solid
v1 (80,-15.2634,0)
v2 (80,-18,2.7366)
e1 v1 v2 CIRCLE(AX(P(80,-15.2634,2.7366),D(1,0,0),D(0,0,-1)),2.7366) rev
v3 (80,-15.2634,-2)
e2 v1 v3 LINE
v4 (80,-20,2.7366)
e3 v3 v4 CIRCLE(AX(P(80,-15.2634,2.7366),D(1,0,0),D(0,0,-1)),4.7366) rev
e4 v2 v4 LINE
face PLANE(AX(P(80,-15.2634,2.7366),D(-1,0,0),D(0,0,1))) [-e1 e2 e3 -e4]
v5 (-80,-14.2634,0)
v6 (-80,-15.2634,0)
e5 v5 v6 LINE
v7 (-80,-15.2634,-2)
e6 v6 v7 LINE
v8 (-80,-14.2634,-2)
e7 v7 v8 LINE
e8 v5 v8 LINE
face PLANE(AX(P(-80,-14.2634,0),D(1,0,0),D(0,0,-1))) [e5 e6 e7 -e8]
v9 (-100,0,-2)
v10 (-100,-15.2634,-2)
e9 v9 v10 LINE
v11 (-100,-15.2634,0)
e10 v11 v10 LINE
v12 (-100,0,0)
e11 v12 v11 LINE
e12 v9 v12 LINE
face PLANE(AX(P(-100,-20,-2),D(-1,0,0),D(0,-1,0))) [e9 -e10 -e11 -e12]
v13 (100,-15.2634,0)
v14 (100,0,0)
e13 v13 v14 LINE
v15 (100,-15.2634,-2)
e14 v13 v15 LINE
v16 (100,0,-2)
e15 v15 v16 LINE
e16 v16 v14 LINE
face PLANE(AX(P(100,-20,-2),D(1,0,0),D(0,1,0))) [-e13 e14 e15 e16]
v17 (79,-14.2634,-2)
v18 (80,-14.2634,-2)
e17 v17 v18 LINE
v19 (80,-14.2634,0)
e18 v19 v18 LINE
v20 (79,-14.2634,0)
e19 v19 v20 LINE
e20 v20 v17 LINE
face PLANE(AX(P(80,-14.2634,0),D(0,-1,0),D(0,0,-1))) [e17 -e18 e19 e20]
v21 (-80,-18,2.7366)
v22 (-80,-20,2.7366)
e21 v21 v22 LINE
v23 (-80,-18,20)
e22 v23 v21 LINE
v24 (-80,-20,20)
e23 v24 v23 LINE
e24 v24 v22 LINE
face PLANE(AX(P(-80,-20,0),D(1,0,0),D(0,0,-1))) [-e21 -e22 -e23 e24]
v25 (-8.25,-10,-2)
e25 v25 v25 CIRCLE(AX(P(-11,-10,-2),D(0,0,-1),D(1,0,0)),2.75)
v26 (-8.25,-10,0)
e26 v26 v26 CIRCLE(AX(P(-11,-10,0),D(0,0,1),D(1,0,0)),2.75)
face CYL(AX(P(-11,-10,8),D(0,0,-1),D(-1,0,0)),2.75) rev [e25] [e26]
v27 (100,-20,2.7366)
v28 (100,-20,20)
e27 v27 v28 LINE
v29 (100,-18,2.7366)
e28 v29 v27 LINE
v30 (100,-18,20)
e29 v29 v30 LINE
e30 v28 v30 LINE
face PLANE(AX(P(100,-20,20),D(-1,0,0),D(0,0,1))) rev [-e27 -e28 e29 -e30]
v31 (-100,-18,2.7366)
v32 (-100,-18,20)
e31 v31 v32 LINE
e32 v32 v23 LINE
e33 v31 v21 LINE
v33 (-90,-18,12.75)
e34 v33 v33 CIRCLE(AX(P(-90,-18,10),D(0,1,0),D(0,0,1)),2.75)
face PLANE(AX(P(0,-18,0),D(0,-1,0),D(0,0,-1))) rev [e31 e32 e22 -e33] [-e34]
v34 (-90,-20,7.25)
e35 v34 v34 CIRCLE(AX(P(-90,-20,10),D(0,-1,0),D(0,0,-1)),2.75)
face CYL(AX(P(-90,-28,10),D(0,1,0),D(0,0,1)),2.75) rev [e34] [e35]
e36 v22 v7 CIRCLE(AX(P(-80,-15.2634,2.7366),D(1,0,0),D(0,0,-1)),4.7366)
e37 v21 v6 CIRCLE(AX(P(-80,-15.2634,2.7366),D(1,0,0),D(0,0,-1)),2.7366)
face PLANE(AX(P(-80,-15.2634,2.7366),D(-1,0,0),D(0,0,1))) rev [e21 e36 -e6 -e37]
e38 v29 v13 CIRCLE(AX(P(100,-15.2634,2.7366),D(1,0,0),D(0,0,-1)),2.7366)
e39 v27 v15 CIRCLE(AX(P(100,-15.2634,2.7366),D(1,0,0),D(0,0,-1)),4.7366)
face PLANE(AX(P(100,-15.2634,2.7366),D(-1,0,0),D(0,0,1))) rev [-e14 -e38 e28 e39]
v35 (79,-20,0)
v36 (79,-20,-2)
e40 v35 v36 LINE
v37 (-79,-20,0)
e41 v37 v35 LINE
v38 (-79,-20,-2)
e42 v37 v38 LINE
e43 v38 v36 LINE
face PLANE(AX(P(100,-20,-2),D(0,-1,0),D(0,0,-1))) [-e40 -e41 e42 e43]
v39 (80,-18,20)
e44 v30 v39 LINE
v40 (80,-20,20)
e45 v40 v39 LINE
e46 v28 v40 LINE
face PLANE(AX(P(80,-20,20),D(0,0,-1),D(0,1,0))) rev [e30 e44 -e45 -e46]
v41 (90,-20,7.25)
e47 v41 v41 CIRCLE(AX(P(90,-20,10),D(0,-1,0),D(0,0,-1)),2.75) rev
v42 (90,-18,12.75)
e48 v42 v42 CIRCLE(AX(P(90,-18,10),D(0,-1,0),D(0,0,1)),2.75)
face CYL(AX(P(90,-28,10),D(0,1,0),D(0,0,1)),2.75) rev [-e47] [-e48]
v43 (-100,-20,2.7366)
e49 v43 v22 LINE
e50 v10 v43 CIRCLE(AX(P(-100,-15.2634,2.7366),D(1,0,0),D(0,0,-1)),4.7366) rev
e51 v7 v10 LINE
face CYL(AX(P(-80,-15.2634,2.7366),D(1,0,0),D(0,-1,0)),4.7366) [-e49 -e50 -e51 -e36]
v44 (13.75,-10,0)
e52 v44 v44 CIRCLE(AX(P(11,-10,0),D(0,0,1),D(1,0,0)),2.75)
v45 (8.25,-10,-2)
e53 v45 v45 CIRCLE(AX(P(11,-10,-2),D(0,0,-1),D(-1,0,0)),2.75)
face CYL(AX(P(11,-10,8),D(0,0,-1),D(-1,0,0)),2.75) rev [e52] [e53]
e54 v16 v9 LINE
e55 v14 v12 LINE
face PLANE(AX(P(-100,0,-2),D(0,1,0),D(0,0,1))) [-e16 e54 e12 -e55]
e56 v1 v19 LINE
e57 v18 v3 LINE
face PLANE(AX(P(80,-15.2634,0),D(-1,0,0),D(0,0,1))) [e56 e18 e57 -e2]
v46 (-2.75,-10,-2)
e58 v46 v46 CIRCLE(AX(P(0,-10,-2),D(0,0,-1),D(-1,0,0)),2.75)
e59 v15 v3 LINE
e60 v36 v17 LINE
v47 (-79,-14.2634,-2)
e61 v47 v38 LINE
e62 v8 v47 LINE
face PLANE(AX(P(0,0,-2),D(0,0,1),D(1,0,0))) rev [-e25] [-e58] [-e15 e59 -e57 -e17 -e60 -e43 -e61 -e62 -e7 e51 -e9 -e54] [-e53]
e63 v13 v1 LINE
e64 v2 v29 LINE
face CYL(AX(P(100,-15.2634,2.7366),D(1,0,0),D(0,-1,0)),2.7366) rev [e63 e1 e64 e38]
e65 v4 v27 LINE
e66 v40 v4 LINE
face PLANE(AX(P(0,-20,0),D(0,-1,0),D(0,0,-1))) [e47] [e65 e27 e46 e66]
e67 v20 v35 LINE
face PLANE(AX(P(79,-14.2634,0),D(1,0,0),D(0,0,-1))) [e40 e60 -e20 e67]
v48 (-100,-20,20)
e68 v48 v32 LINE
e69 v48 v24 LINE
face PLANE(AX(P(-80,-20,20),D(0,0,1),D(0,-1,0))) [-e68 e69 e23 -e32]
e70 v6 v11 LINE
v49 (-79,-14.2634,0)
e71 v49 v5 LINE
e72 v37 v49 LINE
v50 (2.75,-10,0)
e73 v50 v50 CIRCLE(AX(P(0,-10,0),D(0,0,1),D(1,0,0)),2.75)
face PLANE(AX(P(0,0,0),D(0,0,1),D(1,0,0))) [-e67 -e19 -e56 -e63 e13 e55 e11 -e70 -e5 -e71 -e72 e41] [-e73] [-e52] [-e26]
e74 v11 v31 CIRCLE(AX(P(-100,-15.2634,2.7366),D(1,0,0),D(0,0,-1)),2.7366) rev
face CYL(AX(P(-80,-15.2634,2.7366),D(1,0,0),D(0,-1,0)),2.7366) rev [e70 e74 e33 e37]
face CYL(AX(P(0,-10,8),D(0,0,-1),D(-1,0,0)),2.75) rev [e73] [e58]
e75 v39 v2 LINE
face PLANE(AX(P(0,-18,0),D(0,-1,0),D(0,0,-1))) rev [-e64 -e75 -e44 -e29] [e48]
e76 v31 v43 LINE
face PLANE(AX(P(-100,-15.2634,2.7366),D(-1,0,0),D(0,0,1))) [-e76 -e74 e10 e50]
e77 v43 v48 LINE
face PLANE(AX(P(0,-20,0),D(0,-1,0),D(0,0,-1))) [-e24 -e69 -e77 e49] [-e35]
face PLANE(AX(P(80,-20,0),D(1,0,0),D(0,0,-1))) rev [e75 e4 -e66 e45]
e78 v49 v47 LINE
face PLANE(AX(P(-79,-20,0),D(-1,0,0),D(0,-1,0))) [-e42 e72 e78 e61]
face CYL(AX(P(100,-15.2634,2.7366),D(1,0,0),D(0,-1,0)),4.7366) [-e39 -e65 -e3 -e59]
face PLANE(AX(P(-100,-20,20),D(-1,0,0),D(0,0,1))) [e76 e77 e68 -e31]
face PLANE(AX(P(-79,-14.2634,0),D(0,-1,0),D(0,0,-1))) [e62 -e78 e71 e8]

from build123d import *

# Parameters (mm, degrees)
SKETCH_1_W                        = 200
SKETCH_1_H                        = 20
SM_BASE_FLANGE_1_DEPTH            = 2
SM_EDGE_FLANGE_1_STRIP_W          = 13.4732
SM_EDGE_FLANGE_1_STRIP_H          = 2
SM_EDGE_FLANGE_1_STRIP_CUT_DEPTH  = 20
SM_EDGE_FLANGE_1_RELIEF_W         = 14.4732
SM_EDGE_FLANGE_1_RELIEF_H         = 1
SM_EDGE_FLANGE_1_RELIEF_CUT_DEPTH = 2
SM_EDGE_FLANGE_1_DEPTH            = 20
SKETCH_10_R                       = 2.75
CUT_EXTRUDE_2_DEPTH               = 10
SKETCH_11_R                       = 2.75
CUT_EXTRUDE_3_DEPTH               = 10


# Sheet-metal steps are written as plain solids
with BuildPart() as part:
    # Sketch 1 → 基体-法兰1 (new body)
    with BuildSketch(Plane.XY):
        with Locations((0, -10)):
            Rectangle(SKETCH_1_W, SKETCH_1_H)
    extrude(amount=-SM_BASE_FLANGE_1_DEPTH)

    # 边线-法兰1 strip (across the edge) → 边线-法兰1 strip cut (cut)
    with BuildSketch(Plane(origin=(-100, -20, 0), x_dir=(0, 1, 0), z_dir=(1, 0, 0))):
        with Locations((-2, -1)):
            Rectangle(SM_EDGE_FLANGE_1_STRIP_W, SM_EDGE_FLANGE_1_STRIP_H)
    sm_edge_flange_1_strip_cut = extrude(amount=SM_EDGE_FLANGE_1_STRIP_CUT_DEPTH, mode=Mode.SUBTRACT)

    # 边线-法兰1 relief (on the sheet) → 边线-法兰1 relief cut (cut)
    with BuildSketch(Plane(origin=(-100, -15.2634, 0), x_dir=(0, 1, 0), z_dir=(0, 0, 1))):
        with Locations((-6.2366, -20.5)):
            Rectangle(SM_EDGE_FLANGE_1_RELIEF_W, SM_EDGE_FLANGE_1_RELIEF_H)
    sm_edge_flange_1_relief_cut = extrude(amount=-SM_EDGE_FLANGE_1_RELIEF_CUT_DEPTH, mode=Mode.SUBTRACT)

    # 边线-法兰1 section (across the edge) → 边线-法兰1 (add)
    with BuildSketch(Plane(origin=(-100, -20, 0), x_dir=(0, 1, 0), z_dir=(1, 0, 0))):
        with BuildLine():
            Line((0, 2.7366), (0, 20))
            Line((0, 20), (2, 20))
            Line((2, 20), (2, 2.7366))
            ThreePointArc((2, 2.7366), (2.801531583, 0.801531583), (4.7366, 0))
            Line((4.7366, 0), (4.7366, -2))
            ThreePointArc((4.7366, -2), (1.38731802, -0.61268198), (0, 2.7366))
        make_face()
    sm_edge_flange_1 = extrude(amount=SM_EDGE_FLANGE_1_DEPTH)

    # 草图10 → 切除-拉伸2 (cut)
    with BuildSketch(Plane(origin=(0, -18, 0), x_dir=(1, 0, 0), z_dir=(0, 1, 0))):
        with Locations(Location((-90, -10, 0), (0, 0, 270))):
            Circle(SKETCH_10_R)
    cut_extrude_2 = extrude(amount=-CUT_EXTRUDE_2_DEPTH, mode=Mode.SUBTRACT)

    # 镜向1: 边线-法兰1 strip cut, 边线-法兰1 relief cut, 边线-法兰1, 切除-拉伸2 across plane
    add(sm_edge_flange_1_strip_cut.mirror(Plane(origin=(0, 0, 0), x_dir=(0, 0, 1), z_dir=(1, 0, 0))), mode=Mode.SUBTRACT)
    add(sm_edge_flange_1_relief_cut.mirror(Plane(origin=(0, 0, 0), x_dir=(0, 0, 1), z_dir=(1, 0, 0))), mode=Mode.SUBTRACT)
    add(sm_edge_flange_1.mirror(Plane(origin=(0, 0, 0), x_dir=(0, 0, 1), z_dir=(1, 0, 0))))
    add(cut_extrude_2.mirror(Plane(origin=(0, 0, 0), x_dir=(0, 0, 1), z_dir=(1, 0, 0))), mode=Mode.SUBTRACT)

    # 草图11 → 切除-拉伸3 (cut)
    with BuildSketch(Plane(origin=(0, 0, -2), x_dir=(-1, 0, 0), z_dir=(0, 0, -1))):
        with Locations((0, -10)):
            Circle(SKETCH_11_R)
        with Locations((-11, -10)):
            Circle(SKETCH_11_R)
        with Locations(Location((11, -10, 0), (0, 0, 180))):
            Circle(SKETCH_11_R)
    extrude(amount=-CUT_EXTRUDE_3_DEPTH, mode=Mode.SUBTRACT)


solid = part.part
